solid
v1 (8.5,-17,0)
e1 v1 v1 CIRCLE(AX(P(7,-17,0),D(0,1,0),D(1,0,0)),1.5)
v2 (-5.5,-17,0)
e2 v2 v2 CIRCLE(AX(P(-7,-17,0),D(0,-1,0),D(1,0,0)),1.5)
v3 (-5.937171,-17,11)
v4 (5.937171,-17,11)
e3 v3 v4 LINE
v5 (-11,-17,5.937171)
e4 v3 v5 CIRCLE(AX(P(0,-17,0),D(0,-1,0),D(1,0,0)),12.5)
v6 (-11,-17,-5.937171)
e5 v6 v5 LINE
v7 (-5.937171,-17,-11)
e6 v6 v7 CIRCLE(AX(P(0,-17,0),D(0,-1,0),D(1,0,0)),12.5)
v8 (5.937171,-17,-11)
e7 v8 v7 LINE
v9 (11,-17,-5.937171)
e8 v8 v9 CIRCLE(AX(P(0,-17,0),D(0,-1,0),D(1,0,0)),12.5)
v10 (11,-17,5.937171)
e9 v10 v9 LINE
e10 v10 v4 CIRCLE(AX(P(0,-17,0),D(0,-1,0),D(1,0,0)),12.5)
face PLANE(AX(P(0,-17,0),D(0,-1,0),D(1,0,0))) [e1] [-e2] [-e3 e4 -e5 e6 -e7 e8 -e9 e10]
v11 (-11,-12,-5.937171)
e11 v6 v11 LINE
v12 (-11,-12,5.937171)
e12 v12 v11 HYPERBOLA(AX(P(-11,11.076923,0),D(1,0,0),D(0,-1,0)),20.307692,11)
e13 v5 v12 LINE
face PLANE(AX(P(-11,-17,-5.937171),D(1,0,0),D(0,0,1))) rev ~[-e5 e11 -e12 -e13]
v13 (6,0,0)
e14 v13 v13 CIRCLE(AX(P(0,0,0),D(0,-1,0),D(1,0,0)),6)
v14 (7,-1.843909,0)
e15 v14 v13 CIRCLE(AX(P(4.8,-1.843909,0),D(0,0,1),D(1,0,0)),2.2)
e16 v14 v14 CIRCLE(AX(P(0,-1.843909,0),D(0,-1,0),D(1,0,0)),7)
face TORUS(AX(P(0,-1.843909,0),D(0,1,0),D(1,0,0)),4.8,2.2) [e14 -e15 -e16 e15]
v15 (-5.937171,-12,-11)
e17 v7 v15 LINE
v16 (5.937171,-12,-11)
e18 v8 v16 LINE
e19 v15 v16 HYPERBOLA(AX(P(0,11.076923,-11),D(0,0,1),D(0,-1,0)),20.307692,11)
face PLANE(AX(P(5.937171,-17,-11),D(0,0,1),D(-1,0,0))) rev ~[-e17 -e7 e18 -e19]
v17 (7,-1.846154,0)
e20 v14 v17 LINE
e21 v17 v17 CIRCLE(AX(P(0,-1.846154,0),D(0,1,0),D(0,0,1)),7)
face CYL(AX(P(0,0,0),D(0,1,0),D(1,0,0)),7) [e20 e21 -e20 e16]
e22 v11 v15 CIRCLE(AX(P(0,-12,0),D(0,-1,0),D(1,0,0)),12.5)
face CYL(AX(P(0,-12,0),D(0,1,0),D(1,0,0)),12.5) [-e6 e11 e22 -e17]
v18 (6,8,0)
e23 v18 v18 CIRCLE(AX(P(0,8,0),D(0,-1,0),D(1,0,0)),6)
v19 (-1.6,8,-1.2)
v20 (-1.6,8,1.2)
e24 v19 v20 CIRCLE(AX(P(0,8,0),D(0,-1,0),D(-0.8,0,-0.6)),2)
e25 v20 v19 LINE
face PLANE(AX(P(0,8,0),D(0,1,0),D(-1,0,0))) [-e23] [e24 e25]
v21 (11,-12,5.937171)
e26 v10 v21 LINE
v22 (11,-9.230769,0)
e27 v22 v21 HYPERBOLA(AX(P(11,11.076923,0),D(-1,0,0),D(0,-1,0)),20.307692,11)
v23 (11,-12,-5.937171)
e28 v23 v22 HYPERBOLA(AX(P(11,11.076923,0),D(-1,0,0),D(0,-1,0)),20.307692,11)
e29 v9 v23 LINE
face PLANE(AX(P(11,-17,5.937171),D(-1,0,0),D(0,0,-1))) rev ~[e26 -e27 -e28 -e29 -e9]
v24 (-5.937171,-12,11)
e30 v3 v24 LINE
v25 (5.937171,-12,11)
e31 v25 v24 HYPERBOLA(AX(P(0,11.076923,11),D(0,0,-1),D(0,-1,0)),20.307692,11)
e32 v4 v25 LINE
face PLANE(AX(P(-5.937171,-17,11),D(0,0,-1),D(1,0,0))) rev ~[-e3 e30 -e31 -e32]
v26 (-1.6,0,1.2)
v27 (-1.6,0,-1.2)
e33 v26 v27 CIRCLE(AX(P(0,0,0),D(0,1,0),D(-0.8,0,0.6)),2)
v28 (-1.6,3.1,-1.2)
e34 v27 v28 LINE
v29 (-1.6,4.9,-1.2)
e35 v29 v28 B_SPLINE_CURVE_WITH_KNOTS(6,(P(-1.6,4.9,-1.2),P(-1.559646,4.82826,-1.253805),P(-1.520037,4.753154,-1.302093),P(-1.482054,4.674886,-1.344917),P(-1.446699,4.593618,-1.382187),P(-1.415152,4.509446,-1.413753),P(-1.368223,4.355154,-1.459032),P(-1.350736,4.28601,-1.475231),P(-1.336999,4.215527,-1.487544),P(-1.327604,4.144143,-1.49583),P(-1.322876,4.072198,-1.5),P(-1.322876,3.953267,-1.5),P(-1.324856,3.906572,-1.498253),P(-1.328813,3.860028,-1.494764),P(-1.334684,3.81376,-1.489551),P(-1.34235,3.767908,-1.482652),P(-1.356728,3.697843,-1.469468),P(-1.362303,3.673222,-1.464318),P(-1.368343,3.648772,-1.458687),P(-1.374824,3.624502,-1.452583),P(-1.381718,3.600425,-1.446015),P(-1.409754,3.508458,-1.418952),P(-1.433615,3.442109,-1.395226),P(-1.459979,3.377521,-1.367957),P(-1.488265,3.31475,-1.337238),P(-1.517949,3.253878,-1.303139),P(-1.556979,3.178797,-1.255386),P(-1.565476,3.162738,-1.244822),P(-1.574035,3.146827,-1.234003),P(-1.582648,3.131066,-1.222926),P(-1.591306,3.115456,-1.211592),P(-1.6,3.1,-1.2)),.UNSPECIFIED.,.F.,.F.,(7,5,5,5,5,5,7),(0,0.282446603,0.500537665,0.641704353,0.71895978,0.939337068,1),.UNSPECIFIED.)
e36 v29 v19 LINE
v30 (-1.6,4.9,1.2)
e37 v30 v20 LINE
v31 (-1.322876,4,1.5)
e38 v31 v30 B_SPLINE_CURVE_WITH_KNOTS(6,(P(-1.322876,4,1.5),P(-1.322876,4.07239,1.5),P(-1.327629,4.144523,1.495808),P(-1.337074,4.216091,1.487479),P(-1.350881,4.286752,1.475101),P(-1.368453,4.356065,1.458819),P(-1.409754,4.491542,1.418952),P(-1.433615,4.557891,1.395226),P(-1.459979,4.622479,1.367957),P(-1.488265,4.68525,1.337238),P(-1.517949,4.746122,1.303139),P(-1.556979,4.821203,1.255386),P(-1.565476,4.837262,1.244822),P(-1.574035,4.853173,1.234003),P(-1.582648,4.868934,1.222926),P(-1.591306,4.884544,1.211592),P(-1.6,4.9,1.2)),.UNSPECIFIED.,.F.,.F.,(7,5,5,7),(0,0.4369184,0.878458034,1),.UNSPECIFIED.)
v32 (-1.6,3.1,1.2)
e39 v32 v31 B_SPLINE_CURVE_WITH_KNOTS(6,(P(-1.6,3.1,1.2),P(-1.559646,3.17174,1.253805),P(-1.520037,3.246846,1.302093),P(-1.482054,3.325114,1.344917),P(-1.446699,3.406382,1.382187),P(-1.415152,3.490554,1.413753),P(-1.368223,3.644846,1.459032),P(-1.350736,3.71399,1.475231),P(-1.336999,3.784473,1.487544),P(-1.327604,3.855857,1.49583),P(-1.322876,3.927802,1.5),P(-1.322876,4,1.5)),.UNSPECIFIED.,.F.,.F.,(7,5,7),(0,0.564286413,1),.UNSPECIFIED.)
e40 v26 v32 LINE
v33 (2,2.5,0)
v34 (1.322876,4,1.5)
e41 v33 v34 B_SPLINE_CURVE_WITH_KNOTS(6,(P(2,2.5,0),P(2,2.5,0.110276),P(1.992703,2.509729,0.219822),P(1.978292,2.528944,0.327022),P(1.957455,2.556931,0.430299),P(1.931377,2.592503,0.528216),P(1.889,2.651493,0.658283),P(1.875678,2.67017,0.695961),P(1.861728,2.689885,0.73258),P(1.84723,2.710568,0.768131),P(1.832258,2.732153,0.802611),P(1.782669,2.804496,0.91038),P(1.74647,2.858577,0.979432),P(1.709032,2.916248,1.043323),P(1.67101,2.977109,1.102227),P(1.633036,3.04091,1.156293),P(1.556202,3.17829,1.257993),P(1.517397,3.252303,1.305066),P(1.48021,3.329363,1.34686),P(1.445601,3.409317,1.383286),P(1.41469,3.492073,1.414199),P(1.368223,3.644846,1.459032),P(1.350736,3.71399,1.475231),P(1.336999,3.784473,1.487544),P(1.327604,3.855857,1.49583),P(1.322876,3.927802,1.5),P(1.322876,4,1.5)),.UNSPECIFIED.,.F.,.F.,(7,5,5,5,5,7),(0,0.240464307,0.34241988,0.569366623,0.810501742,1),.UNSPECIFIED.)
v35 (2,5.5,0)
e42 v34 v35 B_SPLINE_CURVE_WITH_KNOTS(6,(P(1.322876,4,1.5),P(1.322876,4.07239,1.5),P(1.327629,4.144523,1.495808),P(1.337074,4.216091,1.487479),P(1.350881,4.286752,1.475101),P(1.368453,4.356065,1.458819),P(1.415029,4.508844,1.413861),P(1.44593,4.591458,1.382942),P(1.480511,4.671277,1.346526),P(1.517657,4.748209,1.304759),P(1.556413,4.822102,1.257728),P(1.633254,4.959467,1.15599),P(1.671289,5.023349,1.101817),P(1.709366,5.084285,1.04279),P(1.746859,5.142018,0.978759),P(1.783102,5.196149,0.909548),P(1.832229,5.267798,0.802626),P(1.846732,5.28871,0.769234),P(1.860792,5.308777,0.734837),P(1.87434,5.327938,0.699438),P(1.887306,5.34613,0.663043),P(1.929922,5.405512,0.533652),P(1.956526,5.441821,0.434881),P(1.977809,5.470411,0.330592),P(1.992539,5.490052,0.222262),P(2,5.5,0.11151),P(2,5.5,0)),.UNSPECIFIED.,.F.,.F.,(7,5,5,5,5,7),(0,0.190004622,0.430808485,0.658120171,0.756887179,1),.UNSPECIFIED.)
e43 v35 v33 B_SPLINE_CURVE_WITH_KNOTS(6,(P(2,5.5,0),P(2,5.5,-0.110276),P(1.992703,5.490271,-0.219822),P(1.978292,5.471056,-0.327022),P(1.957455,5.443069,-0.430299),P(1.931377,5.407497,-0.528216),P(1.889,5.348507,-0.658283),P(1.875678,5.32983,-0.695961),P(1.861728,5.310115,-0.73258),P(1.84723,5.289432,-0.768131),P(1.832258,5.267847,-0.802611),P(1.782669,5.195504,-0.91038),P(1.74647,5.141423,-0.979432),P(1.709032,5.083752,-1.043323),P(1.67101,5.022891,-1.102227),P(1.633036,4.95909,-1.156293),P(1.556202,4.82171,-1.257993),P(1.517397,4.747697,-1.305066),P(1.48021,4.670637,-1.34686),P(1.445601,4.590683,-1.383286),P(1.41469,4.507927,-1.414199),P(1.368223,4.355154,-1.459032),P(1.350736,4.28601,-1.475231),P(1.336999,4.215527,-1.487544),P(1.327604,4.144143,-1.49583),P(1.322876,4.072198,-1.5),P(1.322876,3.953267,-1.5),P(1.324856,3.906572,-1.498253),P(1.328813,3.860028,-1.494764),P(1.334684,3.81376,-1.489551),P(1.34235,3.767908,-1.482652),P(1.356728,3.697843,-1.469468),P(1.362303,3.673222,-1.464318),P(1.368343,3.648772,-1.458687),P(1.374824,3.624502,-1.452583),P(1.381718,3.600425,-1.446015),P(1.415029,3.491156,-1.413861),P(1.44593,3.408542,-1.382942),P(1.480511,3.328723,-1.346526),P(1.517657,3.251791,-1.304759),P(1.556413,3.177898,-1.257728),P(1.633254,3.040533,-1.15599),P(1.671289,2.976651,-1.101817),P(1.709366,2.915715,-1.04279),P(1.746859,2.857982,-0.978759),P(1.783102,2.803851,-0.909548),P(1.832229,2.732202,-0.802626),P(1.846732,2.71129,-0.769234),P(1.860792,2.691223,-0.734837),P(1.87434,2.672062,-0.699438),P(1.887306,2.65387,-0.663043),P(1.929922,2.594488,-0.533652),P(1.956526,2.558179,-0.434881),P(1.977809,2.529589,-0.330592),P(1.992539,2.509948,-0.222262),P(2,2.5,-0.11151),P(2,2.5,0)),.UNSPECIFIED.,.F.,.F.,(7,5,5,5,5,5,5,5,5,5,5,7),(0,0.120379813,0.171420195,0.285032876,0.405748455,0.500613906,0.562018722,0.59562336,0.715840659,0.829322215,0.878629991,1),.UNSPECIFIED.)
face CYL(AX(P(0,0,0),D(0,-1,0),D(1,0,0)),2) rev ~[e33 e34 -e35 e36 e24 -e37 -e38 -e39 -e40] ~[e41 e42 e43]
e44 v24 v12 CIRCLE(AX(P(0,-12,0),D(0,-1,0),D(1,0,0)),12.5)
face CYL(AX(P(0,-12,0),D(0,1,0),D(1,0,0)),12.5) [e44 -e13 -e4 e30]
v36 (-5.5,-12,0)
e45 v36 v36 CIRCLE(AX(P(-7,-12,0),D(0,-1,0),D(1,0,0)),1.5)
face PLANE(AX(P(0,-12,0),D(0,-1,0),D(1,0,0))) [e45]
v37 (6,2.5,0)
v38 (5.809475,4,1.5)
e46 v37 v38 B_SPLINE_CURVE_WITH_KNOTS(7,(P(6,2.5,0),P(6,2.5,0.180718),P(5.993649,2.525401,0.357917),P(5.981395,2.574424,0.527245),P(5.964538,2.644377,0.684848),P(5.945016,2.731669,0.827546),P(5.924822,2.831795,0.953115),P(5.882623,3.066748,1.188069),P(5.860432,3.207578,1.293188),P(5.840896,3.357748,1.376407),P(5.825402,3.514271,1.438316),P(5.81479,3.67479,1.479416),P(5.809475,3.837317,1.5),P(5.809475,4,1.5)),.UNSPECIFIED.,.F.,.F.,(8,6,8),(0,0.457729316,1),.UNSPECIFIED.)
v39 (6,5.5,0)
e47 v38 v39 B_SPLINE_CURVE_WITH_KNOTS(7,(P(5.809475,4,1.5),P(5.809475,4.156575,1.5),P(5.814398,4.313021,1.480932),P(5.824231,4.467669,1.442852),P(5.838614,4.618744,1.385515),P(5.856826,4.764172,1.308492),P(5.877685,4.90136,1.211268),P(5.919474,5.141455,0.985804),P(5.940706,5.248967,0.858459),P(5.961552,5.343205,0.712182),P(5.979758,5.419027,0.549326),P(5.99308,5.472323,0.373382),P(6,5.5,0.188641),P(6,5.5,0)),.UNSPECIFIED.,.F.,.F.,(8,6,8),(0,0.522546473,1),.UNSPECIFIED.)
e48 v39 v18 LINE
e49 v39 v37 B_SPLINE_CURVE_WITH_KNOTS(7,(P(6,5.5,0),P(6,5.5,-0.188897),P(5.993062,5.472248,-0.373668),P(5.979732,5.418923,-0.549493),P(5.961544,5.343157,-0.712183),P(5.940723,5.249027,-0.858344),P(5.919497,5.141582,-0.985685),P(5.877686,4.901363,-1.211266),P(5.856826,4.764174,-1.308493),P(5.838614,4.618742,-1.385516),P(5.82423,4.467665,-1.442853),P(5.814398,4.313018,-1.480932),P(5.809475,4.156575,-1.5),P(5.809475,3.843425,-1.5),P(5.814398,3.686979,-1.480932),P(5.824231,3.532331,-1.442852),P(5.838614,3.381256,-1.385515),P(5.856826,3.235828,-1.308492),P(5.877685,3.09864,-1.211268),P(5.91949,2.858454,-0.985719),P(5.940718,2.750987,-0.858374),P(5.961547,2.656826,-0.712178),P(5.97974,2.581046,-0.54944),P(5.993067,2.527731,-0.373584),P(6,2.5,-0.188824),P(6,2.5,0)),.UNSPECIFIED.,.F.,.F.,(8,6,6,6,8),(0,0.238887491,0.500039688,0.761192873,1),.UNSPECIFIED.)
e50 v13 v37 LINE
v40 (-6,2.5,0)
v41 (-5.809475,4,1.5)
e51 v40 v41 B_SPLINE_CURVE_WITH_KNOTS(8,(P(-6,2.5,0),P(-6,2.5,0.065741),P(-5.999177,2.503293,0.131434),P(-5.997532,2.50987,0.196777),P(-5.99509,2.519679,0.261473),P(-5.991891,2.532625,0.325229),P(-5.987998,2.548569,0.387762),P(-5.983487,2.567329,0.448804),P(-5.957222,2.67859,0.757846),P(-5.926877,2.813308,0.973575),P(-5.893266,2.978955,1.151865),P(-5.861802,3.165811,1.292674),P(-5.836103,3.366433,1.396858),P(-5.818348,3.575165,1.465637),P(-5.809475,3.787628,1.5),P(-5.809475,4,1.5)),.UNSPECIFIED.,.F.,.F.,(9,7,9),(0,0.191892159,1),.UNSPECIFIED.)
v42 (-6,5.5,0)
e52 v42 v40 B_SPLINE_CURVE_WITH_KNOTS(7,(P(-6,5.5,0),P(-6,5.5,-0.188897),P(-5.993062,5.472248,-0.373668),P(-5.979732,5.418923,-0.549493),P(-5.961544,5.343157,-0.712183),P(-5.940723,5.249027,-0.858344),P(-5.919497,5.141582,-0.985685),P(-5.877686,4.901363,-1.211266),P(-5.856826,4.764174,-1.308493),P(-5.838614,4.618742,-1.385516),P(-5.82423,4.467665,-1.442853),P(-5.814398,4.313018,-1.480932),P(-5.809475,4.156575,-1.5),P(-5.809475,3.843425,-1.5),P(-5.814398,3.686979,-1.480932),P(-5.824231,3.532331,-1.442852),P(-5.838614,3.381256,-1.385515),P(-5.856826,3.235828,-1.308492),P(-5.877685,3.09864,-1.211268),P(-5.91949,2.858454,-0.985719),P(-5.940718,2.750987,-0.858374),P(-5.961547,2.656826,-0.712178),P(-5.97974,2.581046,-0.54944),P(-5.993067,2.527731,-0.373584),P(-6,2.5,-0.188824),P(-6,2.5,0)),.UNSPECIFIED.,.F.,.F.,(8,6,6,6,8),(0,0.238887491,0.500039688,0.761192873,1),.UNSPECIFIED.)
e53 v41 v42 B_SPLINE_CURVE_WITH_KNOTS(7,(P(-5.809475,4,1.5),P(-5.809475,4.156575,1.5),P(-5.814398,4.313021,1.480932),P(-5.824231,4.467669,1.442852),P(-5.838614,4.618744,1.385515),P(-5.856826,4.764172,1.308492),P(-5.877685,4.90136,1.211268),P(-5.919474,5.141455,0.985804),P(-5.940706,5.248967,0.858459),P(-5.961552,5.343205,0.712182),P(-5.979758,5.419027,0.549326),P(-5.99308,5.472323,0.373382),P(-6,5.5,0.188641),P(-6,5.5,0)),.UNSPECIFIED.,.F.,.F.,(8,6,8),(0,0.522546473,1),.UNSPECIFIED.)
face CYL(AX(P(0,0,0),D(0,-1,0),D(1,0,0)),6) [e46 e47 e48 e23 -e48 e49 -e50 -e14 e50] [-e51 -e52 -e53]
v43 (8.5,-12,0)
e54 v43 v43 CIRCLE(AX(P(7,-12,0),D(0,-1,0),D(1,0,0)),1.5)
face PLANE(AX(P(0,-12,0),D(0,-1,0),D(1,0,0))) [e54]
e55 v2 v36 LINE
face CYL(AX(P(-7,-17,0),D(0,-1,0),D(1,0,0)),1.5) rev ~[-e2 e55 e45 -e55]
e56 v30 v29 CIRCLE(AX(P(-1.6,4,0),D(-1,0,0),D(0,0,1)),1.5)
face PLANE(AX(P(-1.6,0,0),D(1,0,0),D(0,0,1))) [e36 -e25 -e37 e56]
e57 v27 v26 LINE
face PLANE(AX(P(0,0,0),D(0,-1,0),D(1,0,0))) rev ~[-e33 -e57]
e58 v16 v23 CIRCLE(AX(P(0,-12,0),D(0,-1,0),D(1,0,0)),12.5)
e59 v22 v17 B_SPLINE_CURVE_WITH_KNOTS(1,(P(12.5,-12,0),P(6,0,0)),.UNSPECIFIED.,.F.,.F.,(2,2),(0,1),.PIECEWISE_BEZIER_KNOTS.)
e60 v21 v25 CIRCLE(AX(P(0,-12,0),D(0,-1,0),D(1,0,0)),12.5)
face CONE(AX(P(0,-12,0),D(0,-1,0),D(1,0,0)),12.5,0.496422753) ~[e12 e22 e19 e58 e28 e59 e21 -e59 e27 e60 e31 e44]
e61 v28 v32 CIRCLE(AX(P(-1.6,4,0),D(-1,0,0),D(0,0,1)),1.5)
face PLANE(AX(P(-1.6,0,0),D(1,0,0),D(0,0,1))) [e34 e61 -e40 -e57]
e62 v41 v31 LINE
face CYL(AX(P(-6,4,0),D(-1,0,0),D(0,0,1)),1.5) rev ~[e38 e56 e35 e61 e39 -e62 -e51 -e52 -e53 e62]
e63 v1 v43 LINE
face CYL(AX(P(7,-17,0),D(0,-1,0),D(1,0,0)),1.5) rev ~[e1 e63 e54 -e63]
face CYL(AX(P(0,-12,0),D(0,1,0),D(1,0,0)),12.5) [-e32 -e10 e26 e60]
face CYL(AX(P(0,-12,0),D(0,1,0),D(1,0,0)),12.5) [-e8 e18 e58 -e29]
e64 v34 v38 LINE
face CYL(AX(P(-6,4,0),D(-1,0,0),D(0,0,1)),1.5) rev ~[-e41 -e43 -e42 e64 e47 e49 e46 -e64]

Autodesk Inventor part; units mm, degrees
ref_plane "YZ Plane" through (0, 0, 0) normal (1, 0, 0) x (0, 1, 0)
ref_plane "XZ Plane" through (0, 0, 0) normal (0, 1, 0) x (-1, 0, 0)
ref_plane "XY Plane" through (0, 0, 0) normal (0, 0, 1) x (1, 0, 0)
sketch "Szkic2" plane through (0, 0, 0) normal (0, 1, 0) x (-1, 0, 0)
  line L0 (-6, 6) -> (6, 6)
  line L1 (6, 6) -> (6, -6)
  line L2 (6, -6) -> (-6, -6)
  line L3 (-6, -6) -> (-6, 6)
  line L4 (-6, 6) -> (6, -6) construction
  line L5 (6, 6) -> (-6, -6) construction
  point P0 (0, 0)
  dimension "d3" = 12
  dimension "d4" = 12
extrude "Wyciągnięcie proste1" add sketch "Szkic2" along normal blind 8
sketch "Szkic5" plane through (-6, 0, -6) normal (-1, 0, 0) x (0, 0, 1)
  line L0 (0, 8) -> (12, 8) projected
  line L1 (6, 8) -> (6, 0)
  line L2 (6, 0) -> (6, 8)
  line L3 (6, 8) -> (6, 4)
  circle A0 centre (6, 4) radius 1.5
  dimension "d10" = 4
  dimension "d11" = 3
extrude "Wyciągnięcie proste2" cut sketch "Szkic5" against normal through all
thread "Gwint1" size "M3x0.5" class "6H" standard "ANSI Metric M Profile" full length
sketch "Szkic6" plane through (0, 0, 0) normal (0, -1, 0) x (1, 0, 0)
  circle A0 centre (0, 0) radius 6
  circle A1 centre (0, 0) radius 8
  circle A2 centre (0, 0) radius 2
  line L0 (0, 0) -> (2, 0)
  line L1 (0, 0) -> (-1.6, 0)
  line L2 (-1.6, 0) -> (-1.6, -1.2)
  line L3 (-1.6, 0) -> (-1.6, 1.2)
  line L4 (-6, 6) -> (6, 6) projected
  circle A3 centre (0, 0) radius 8.4853
  point P0 (-5.2915, 6)
  point P1 (5.2915, 6)
  point P2 (0, 6)
extrude "Wyciągnięcie proste3" cut sketch "Szkic6" against normal blind 8 contours L4 A1 | L4 A3 A1 | A1 L4 A3 | L0 L1 L3 A2 | A2 L2 L1 L0 picked at (7.1897, -1.149)
sketch "Szkic11" plane through (0, 0, 0) normal (0, -1, 0) x (1, 0, 0)
  circle A0 centre (0, 0) radius 6
  circle A1 centre (0, 0) radius 7
  dimension "d24" = 14
extrude "Wyciągnięcie proste4" add sketch "Szkic11" along normal blind 12 contours A0 | A1
sketch "Szkic18" plane through (0, -12, 0) normal (0, -1, 0) x (1, 0, 0)
  arc A0 (-1.6, -1.2) -> (-1.6, 1.2) centre (0, 0) ccw projected
  circle A1 centre (0, 0) radius 12.5
  dimension "d35" = 25
loft "Wyciągnięcie złożone2" add profiles "Szkic18" section 2 edges at (0, 0, -6)
sketch "Szkic19" plane through (0, -12, 0) normal (0, -1, 0) x (1, 0, 0)
  circle A0 centre (0, 0) radius 12.5
sketch "Szkic20" plane through (0, -12, 0) normal (0, -1, 0) x (1, 0, 0)
  point P0 (0, 0)
extrude "Wyciągnięcie proste6" add sketch "Szkic19" along normal blind 5
sketch "Szkic21" plane through (0, -17, 0) normal (0, -1, 0) x (1, 0, 0)
  line L0 (-11, 11) -> (11, 11)
  line L1 (11, 11) -> (11, -11)
  line L2 (11, -11) -> (-11, -11)
  line L3 (-11, -11) -> (-11, 11)
  circle A0 centre (0, 0) radius 6 projected
  line L4 (-11, 11) -> (11, -11) construction
  line L5 (11, 11) -> (-11, -11) construction
  circle A1 centre (0, 0) radius 12.5
  point P0 (5.9372, 11)
  point P1 (-5.9372, 11)
  point P2 (11, 5.9372)
  point P3 (11, -5.9372)
  point P4 (-11, 5.9372)
  point P5 (-11, -5.9372)
  point P6 (-5.9372, -11)
  point P7 (5.9372, -11)
  dimension "d42" = 22
  dimension "d43" = 22
extrude "Wyciągnięcie proste7" cut sketch "Szkic21" against normal through all contours A1 L0 | L3 A1 | A1 L1 | L2 A1
sketch "Szkic22" plane through (0, -17, 0) normal (0, -1, 0) x (1, 0, 0)
  line L0 (0, 0) -> (-7, 0)
  line L1 (0, 0) -> (7, 0)
  circle A0 centre (-7, 0) radius 1.5
  circle A1 centre (7, 0) radius 1.5
  dimension "d46" = 7
  dimension "d47" = 7
  dimension "d48" = 3
  dimension "d49" = 3
extrude "Wyciągnięcie proste8" cut sketch "Szkic22" against normal blind 5
thread "Gwint2" size "M3x0.5" class "6H" standard "ANSI Metric M Profile" full length
thread "Gwint3" size "M3x0.5" class "6H" standard "ANSI Metric M Profile" full length
fillet "Zaokrąglenie1" radius 2.2 1 edges at (-7, 0, 0)
properties part number "MocowanieChwytakaElement1"
